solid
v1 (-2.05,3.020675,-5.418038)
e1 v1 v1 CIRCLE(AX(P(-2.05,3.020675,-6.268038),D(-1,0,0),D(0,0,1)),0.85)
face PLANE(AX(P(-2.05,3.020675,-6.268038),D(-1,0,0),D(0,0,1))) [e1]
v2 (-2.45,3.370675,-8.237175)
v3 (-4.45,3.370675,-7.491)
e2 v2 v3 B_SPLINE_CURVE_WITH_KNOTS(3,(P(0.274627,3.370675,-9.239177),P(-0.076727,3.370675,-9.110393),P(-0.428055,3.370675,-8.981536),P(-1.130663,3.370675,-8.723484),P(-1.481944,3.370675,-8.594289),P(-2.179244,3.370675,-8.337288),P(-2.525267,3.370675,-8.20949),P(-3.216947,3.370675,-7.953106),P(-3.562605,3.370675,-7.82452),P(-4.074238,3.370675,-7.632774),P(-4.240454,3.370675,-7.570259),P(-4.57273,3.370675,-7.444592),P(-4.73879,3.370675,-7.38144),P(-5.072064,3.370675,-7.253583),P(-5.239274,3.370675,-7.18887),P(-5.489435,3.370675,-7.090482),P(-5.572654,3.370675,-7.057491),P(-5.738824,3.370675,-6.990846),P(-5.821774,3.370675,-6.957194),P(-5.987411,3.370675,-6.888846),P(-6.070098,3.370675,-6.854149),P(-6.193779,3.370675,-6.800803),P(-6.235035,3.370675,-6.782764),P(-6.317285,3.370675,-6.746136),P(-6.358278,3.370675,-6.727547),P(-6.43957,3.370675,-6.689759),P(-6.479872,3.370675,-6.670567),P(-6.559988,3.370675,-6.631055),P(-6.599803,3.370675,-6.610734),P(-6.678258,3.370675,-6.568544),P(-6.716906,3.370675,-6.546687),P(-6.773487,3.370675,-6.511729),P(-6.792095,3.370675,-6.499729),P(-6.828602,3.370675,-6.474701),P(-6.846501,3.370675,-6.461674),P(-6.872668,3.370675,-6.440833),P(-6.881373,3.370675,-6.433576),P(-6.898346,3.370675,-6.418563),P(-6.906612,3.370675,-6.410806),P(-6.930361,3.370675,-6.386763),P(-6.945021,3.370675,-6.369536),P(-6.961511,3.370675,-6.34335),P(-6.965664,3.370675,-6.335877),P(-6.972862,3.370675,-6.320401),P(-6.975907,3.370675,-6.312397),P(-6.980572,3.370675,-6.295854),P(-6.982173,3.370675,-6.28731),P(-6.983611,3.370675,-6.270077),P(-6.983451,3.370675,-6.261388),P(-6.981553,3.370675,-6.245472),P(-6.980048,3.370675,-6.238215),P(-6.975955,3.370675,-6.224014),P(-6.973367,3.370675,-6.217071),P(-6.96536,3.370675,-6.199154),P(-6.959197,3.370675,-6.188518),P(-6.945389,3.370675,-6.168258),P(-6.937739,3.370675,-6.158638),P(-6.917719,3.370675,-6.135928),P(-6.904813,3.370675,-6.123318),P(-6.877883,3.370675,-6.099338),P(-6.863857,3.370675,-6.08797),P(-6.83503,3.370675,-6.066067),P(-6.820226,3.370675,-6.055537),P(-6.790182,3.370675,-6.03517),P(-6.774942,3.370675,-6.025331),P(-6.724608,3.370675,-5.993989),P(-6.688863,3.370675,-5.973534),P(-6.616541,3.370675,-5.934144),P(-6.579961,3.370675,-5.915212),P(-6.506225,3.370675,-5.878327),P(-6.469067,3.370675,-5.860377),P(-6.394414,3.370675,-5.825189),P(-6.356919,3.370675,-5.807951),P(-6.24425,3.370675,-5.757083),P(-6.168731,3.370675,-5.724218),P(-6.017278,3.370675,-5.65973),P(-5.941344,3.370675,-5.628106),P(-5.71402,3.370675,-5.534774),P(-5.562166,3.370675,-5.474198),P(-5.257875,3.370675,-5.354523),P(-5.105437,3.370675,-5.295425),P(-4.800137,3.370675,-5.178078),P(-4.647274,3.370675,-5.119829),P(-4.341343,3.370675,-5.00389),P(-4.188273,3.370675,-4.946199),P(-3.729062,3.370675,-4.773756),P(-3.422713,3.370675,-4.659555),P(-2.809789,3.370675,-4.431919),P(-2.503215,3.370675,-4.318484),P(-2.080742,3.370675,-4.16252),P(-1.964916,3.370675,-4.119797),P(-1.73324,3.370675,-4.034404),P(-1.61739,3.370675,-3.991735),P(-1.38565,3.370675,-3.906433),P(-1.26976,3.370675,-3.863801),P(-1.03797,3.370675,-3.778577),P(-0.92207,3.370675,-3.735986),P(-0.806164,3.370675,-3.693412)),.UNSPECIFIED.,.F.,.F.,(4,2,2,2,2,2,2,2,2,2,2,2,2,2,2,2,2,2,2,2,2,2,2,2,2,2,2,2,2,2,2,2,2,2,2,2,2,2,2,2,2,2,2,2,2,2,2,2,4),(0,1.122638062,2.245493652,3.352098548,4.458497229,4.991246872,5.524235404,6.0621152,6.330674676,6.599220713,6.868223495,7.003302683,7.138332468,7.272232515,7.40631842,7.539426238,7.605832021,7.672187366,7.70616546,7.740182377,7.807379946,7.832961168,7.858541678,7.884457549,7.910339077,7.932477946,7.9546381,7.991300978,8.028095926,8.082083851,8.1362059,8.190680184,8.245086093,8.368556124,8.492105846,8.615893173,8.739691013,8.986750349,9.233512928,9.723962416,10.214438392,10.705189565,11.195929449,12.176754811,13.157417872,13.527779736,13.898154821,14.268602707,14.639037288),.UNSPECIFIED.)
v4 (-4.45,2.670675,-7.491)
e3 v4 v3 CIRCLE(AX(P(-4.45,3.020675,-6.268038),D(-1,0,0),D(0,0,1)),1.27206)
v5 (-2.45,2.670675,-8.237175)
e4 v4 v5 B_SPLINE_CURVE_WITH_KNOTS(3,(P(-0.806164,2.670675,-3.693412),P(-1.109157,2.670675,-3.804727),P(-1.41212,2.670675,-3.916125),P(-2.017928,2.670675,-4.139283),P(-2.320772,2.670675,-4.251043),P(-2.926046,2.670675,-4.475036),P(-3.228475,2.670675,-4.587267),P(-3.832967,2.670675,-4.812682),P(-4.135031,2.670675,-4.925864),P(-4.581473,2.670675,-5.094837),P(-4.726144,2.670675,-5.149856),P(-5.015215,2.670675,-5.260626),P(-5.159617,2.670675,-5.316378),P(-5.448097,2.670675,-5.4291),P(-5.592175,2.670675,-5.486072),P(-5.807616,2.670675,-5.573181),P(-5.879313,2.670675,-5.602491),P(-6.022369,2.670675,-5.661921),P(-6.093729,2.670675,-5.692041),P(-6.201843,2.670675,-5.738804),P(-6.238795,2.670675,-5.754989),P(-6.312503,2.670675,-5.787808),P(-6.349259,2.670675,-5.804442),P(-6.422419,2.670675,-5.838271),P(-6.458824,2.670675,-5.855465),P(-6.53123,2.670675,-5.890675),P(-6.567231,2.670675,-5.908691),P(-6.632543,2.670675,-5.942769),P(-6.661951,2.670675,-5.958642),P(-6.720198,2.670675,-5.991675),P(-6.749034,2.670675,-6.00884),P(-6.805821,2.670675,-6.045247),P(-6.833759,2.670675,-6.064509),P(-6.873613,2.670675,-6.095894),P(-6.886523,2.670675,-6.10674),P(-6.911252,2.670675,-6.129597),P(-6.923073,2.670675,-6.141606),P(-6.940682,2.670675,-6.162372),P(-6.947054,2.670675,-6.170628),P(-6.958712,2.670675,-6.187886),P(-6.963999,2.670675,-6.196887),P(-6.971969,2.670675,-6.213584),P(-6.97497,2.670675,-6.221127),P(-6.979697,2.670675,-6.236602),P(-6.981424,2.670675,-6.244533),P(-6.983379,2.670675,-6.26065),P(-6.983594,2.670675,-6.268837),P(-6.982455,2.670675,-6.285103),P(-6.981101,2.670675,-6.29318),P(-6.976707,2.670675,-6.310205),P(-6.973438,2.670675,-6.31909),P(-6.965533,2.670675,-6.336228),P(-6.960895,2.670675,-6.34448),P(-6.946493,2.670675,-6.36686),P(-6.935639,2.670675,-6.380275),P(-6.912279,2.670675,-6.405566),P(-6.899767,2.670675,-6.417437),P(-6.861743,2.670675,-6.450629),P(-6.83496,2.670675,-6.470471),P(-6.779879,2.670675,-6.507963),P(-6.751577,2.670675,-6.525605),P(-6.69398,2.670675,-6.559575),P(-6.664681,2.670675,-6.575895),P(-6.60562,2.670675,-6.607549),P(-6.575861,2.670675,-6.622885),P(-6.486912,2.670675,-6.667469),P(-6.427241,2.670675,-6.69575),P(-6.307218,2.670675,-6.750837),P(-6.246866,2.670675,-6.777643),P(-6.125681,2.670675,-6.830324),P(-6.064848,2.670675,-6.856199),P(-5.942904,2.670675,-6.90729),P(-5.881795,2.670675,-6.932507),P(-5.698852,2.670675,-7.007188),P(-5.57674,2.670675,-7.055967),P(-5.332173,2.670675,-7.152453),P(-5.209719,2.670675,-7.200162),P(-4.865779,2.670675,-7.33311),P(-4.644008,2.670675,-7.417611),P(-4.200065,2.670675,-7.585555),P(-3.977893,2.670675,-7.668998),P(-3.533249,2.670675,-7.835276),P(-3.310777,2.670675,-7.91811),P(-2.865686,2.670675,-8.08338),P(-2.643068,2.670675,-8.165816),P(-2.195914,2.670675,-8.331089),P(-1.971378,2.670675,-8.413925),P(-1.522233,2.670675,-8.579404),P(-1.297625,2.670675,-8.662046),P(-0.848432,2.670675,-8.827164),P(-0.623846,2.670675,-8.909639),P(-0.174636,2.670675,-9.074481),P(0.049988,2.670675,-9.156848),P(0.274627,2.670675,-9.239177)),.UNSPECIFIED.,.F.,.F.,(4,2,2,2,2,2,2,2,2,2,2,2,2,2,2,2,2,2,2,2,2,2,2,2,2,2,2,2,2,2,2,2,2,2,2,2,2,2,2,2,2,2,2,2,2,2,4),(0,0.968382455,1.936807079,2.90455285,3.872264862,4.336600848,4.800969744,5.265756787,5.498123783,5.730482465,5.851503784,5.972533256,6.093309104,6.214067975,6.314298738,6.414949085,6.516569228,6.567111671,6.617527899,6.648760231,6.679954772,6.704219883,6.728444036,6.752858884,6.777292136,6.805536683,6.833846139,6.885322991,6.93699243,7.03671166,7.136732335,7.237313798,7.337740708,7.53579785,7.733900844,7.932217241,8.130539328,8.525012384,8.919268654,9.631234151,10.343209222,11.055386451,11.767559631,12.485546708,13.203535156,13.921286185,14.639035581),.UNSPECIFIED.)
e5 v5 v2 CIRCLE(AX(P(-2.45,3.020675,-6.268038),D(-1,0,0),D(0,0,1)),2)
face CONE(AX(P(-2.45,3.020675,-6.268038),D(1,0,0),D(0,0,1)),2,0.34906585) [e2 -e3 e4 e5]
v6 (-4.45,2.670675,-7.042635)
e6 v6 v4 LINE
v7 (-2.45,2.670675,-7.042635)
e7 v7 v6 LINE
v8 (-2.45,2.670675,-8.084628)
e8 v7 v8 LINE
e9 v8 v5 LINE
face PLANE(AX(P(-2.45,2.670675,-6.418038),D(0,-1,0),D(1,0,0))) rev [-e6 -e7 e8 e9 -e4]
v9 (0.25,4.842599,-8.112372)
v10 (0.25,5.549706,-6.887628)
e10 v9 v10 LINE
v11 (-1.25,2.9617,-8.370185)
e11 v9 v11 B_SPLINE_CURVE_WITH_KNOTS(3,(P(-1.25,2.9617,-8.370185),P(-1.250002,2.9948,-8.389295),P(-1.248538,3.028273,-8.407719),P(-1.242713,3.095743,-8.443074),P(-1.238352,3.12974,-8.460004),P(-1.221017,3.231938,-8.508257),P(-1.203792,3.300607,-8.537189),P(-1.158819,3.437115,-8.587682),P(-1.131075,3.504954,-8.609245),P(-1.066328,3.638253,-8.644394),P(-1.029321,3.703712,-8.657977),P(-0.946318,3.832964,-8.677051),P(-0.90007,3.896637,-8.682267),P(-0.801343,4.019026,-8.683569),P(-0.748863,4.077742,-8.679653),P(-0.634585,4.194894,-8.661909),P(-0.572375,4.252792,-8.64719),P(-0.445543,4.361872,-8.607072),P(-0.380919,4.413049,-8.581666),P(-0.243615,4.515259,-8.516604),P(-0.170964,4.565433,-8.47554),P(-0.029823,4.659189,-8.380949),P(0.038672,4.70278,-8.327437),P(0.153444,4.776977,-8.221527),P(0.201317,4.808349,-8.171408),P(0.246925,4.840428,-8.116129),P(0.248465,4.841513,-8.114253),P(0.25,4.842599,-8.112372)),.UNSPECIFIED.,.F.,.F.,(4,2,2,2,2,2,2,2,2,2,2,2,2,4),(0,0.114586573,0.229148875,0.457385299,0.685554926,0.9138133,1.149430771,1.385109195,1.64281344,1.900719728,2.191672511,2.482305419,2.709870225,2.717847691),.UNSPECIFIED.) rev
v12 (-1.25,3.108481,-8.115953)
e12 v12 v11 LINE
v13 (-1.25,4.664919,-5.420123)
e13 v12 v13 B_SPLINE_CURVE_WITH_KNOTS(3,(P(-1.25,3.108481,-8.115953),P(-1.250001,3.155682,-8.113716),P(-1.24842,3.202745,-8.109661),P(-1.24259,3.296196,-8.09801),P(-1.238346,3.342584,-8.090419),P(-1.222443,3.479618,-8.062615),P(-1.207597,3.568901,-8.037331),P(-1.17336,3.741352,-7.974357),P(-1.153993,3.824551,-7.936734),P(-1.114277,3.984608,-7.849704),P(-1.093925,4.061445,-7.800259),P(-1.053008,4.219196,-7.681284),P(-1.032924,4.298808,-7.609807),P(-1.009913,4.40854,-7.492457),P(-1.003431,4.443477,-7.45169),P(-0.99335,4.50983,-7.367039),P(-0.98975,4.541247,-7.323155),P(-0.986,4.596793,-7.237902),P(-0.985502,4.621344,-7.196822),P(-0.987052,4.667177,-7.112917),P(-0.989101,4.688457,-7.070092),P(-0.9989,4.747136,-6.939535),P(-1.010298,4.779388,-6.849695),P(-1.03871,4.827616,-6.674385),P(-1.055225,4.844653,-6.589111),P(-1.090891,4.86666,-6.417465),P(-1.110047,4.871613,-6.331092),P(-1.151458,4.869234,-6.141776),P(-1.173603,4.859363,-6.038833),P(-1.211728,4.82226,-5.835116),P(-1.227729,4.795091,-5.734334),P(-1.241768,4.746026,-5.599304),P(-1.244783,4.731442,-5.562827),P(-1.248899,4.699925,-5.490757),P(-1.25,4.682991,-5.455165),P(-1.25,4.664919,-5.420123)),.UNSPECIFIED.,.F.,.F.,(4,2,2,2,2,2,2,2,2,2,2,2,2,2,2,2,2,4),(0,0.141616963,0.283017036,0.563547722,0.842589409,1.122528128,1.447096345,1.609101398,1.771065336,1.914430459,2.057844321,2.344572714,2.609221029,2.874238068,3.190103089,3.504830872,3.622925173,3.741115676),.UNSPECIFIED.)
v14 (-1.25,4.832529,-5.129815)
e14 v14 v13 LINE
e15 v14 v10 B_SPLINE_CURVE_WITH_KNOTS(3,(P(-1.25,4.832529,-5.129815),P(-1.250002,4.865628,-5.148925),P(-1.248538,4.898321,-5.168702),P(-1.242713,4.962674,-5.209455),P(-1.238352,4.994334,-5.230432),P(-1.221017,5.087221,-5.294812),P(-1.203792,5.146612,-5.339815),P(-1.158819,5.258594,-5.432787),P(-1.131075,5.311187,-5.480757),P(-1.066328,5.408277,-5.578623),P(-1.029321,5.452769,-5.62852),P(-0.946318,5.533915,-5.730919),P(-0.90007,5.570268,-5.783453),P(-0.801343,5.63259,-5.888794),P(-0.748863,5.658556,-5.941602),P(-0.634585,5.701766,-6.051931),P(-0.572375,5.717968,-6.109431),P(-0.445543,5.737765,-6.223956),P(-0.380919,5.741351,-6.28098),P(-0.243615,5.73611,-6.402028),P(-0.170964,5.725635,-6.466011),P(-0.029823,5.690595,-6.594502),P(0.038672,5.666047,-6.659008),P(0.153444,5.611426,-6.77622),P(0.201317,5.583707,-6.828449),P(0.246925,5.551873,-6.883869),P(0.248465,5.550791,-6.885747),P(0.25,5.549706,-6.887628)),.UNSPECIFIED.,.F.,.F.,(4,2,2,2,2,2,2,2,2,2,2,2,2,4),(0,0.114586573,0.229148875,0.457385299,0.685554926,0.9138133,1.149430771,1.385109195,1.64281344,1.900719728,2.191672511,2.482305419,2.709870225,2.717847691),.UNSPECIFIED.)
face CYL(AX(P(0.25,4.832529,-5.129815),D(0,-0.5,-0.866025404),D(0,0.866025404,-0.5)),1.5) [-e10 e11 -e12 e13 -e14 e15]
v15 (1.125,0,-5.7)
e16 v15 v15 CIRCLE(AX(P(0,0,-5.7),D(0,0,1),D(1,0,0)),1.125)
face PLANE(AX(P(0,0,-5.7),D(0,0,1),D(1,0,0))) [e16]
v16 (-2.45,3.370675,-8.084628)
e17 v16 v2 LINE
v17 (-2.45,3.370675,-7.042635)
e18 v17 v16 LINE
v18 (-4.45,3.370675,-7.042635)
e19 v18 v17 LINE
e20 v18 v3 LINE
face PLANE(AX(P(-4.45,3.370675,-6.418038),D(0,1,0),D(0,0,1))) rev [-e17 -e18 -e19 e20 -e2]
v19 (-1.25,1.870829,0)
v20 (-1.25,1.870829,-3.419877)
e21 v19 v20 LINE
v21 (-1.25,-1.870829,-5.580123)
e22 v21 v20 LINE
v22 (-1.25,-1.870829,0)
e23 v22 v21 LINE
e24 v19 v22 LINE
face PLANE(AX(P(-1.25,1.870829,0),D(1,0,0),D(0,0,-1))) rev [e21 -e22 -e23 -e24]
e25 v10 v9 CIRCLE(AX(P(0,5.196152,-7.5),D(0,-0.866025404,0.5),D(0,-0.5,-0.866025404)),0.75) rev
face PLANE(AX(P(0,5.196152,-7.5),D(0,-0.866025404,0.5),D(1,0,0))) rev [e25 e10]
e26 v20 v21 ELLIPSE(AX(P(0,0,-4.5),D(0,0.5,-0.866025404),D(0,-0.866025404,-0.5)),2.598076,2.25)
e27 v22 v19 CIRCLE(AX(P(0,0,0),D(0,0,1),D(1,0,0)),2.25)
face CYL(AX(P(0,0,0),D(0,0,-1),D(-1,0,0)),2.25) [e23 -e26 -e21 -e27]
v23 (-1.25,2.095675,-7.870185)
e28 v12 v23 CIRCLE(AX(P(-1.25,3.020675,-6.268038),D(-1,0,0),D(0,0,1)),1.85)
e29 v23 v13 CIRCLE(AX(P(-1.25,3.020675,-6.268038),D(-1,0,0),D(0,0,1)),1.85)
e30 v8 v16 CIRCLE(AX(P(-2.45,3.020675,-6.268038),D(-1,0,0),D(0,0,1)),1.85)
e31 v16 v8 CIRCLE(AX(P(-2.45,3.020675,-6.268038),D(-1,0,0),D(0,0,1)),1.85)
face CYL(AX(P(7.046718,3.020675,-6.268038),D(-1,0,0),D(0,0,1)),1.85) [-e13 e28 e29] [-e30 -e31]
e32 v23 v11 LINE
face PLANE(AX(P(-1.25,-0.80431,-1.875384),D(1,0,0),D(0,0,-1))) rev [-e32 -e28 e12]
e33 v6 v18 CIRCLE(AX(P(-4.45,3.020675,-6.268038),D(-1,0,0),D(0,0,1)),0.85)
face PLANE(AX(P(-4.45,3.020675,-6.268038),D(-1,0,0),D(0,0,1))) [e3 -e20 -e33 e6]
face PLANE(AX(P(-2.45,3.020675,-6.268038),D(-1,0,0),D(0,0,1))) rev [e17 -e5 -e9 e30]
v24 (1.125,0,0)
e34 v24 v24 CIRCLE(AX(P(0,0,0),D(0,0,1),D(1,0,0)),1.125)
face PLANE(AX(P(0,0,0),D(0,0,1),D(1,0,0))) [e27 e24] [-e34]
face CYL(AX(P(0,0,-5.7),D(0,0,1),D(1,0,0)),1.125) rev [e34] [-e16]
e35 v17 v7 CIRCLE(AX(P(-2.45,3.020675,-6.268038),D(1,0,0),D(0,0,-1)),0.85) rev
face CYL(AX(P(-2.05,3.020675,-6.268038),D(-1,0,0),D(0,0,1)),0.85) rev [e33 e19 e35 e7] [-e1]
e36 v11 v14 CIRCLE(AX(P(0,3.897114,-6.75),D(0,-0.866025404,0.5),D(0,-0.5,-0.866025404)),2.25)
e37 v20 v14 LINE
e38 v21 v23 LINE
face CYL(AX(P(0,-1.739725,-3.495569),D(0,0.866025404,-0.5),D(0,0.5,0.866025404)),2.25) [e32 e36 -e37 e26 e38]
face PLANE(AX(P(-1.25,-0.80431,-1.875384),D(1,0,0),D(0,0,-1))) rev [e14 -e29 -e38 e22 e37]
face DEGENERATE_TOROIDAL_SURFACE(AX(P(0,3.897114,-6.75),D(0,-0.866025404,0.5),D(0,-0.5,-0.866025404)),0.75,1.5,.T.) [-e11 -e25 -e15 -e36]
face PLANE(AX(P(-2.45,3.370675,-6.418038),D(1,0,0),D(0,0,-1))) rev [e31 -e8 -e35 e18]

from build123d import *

# Parameters (mm, degrees)
FILLET1_R                       = 1.5
SKETCH3_R                       = 1.125
CUT_EXTRUDE1_DEPTH              = 5.7
SKETCH4_R                       = 1.85
BOSS_EXTRUDE1_DEPTH             = 1.2
BOSS_EXTRUDE1_DIRECTION_2_REACH = 13.17
SKETCH5_R                       = 2
BOSS_EXTRUDE2_DEPTH             = 2
BOSS_EXTRUDE2_TAPER             = 20
SKETCH8_R                       = 0.85
CUT_EXTRUDE2_DEPTH              = 2.4
SKETCH7_W                       = 2
SKETCH7_H                       = 0.7
CUT_EXTRUDE5_DEPTH              = 1.7


with BuildPart() as part:
    # Sweep1: sweep along a path in Sketch2
    with BuildLine(Plane(origin=(0, 0, 0), x_dir=(0, 0, -1), z_dir=(1, 0, 0))) as sweep1_path:
        Line((0, 0), (4.5, 0))
        Line((4.5, 0), (7.5, 5.196152423))
    # Sketch1 → Sweep1 (sweep)
    with BuildSketch(Plane.XY):
        with BuildLine():
            Line((-1.25, 1.870828693), (-1.25, -1.870828693))
            ThreePointArc((-1.25, -1.870828693), (2.25, 0), (-1.25, 1.870828693))
        make_face()
    sweep(path=sweep1_path.line, transition=Transition.RIGHT)

    # Fillet1
    # the kernel refuses this fillet: 1.5 mm, written as the material it takes off along each edge
    with BuildSketch(Plane(origin=(0, 5.196152423, -7.5), x_dir=(-0.9999950652018581, 0.0015707937429397924, 0.0027206945709829077), z_dir=(-0.003141587485879499, -0.4999975326009265, -0.8660211301238867))) as fillet1_piece_1:
        with BuildLine():
            CenterArc((2.25 - FILLET1_R, -FILLET1_R), FILLET1_R, 360, 90)
            Line((2.25 - FILLET1_R, 0), (2.25, 0))
            Line((2.25, 0), (2.25, -FILLET1_R))
        make_face()
    revolve(axis=Axis((0, 5.196152423, -7.5), (0, 0.8660254037844402, -0.49999999999999745)), revolution_arc=359.64, mode=Mode.SUBTRACT)
    with BuildSketch(Plane(origin=(-1.25, 8.006566769, -2.632219561), x_dir=(0, -0.8660254037844399, 0.49999999999999756), z_dir=(0, -0.4999999999999976, -0.86602540378444))) as fillet1_piece_2:
        with BuildLine():
            CenterArc((FILLET1_R, -FILLET1_R), FILLET1_R, 90, 90)
            Line((0, -FILLET1_R), (0, 0))
            Line((0, 0), (FILLET1_R, 0))
        make_face()
    extrude(amount=11.241657387, mode=Mode.SUBTRACT)

    # Sketch3 → Cut-Extrude1 (cut)
    with BuildSketch(Plane.XY):
        Circle(SKETCH3_R)
    extrude(amount=-CUT_EXTRUDE1_DEPTH, mode=Mode.SUBTRACT)

    # Sketch4 → Boss-Extrude1 (add)
    with BuildSketch(Plane.ZY.offset(1.25)):
        with Locations((-6.268038178, 3.020674567)):
            Circle(SKETCH4_R)
    extrude(amount=BOSS_EXTRUDE1_DEPTH)

    # Sketch4 → Boss-Extrude1 direction 2 (add, up to next)
    with BuildSketch(Plane.ZY.offset(1.25), mode=Mode.PRIVATE) as boss_extrude1_direction_2_sk1:
        with Locations((-6.268038178, 3.020674567)):
            Circle(SKETCH4_R)
    boss_extrude1_direction_2_tool1 = extrude(boss_extrude1_direction_2_sk1.sketch, amount=-BOSS_EXTRUDE1_DIRECTION_2_REACH, mode=Mode.PRIVATE) - part.part
    add(boss_extrude1_direction_2_tool1.solids().sort_by_distance((-1.25, 3.020675, -6.268038))[0])

    # Sketch5 → Boss-Extrude2 (add)
    with BuildSketch(Plane.ZY.offset(2.45)):
        with Locations((-6.268038178, 3.020674567)):
            Circle(SKETCH5_R)
    extrude(amount=BOSS_EXTRUDE2_DEPTH, taper=BOSS_EXTRUDE2_TAPER)

    # Sketch8 → Cut-Extrude2 (cut)
    with BuildSketch(Plane.ZY.offset(4.45)):
        with Locations((-6.268038178, 3.020674567)):
            Circle(SKETCH8_R)
    extrude(amount=-CUT_EXTRUDE2_DEPTH, mode=Mode.SUBTRACT)

    # Sketch7 → Cut-Extrude5 (cut, symmetric)
    with BuildSketch(Plane(origin=(0, 0, -8.118038178), x_dir=(-1, 0, 0), z_dir=(0, 0, -1))):
        with Locations((3.45, 3.020674567)):
            Rectangle(SKETCH7_W, SKETCH7_H)
    extrude(amount=CUT_EXTRUDE5_DEPTH, both=True, mode=Mode.SUBTRACT)


solid = part.part
